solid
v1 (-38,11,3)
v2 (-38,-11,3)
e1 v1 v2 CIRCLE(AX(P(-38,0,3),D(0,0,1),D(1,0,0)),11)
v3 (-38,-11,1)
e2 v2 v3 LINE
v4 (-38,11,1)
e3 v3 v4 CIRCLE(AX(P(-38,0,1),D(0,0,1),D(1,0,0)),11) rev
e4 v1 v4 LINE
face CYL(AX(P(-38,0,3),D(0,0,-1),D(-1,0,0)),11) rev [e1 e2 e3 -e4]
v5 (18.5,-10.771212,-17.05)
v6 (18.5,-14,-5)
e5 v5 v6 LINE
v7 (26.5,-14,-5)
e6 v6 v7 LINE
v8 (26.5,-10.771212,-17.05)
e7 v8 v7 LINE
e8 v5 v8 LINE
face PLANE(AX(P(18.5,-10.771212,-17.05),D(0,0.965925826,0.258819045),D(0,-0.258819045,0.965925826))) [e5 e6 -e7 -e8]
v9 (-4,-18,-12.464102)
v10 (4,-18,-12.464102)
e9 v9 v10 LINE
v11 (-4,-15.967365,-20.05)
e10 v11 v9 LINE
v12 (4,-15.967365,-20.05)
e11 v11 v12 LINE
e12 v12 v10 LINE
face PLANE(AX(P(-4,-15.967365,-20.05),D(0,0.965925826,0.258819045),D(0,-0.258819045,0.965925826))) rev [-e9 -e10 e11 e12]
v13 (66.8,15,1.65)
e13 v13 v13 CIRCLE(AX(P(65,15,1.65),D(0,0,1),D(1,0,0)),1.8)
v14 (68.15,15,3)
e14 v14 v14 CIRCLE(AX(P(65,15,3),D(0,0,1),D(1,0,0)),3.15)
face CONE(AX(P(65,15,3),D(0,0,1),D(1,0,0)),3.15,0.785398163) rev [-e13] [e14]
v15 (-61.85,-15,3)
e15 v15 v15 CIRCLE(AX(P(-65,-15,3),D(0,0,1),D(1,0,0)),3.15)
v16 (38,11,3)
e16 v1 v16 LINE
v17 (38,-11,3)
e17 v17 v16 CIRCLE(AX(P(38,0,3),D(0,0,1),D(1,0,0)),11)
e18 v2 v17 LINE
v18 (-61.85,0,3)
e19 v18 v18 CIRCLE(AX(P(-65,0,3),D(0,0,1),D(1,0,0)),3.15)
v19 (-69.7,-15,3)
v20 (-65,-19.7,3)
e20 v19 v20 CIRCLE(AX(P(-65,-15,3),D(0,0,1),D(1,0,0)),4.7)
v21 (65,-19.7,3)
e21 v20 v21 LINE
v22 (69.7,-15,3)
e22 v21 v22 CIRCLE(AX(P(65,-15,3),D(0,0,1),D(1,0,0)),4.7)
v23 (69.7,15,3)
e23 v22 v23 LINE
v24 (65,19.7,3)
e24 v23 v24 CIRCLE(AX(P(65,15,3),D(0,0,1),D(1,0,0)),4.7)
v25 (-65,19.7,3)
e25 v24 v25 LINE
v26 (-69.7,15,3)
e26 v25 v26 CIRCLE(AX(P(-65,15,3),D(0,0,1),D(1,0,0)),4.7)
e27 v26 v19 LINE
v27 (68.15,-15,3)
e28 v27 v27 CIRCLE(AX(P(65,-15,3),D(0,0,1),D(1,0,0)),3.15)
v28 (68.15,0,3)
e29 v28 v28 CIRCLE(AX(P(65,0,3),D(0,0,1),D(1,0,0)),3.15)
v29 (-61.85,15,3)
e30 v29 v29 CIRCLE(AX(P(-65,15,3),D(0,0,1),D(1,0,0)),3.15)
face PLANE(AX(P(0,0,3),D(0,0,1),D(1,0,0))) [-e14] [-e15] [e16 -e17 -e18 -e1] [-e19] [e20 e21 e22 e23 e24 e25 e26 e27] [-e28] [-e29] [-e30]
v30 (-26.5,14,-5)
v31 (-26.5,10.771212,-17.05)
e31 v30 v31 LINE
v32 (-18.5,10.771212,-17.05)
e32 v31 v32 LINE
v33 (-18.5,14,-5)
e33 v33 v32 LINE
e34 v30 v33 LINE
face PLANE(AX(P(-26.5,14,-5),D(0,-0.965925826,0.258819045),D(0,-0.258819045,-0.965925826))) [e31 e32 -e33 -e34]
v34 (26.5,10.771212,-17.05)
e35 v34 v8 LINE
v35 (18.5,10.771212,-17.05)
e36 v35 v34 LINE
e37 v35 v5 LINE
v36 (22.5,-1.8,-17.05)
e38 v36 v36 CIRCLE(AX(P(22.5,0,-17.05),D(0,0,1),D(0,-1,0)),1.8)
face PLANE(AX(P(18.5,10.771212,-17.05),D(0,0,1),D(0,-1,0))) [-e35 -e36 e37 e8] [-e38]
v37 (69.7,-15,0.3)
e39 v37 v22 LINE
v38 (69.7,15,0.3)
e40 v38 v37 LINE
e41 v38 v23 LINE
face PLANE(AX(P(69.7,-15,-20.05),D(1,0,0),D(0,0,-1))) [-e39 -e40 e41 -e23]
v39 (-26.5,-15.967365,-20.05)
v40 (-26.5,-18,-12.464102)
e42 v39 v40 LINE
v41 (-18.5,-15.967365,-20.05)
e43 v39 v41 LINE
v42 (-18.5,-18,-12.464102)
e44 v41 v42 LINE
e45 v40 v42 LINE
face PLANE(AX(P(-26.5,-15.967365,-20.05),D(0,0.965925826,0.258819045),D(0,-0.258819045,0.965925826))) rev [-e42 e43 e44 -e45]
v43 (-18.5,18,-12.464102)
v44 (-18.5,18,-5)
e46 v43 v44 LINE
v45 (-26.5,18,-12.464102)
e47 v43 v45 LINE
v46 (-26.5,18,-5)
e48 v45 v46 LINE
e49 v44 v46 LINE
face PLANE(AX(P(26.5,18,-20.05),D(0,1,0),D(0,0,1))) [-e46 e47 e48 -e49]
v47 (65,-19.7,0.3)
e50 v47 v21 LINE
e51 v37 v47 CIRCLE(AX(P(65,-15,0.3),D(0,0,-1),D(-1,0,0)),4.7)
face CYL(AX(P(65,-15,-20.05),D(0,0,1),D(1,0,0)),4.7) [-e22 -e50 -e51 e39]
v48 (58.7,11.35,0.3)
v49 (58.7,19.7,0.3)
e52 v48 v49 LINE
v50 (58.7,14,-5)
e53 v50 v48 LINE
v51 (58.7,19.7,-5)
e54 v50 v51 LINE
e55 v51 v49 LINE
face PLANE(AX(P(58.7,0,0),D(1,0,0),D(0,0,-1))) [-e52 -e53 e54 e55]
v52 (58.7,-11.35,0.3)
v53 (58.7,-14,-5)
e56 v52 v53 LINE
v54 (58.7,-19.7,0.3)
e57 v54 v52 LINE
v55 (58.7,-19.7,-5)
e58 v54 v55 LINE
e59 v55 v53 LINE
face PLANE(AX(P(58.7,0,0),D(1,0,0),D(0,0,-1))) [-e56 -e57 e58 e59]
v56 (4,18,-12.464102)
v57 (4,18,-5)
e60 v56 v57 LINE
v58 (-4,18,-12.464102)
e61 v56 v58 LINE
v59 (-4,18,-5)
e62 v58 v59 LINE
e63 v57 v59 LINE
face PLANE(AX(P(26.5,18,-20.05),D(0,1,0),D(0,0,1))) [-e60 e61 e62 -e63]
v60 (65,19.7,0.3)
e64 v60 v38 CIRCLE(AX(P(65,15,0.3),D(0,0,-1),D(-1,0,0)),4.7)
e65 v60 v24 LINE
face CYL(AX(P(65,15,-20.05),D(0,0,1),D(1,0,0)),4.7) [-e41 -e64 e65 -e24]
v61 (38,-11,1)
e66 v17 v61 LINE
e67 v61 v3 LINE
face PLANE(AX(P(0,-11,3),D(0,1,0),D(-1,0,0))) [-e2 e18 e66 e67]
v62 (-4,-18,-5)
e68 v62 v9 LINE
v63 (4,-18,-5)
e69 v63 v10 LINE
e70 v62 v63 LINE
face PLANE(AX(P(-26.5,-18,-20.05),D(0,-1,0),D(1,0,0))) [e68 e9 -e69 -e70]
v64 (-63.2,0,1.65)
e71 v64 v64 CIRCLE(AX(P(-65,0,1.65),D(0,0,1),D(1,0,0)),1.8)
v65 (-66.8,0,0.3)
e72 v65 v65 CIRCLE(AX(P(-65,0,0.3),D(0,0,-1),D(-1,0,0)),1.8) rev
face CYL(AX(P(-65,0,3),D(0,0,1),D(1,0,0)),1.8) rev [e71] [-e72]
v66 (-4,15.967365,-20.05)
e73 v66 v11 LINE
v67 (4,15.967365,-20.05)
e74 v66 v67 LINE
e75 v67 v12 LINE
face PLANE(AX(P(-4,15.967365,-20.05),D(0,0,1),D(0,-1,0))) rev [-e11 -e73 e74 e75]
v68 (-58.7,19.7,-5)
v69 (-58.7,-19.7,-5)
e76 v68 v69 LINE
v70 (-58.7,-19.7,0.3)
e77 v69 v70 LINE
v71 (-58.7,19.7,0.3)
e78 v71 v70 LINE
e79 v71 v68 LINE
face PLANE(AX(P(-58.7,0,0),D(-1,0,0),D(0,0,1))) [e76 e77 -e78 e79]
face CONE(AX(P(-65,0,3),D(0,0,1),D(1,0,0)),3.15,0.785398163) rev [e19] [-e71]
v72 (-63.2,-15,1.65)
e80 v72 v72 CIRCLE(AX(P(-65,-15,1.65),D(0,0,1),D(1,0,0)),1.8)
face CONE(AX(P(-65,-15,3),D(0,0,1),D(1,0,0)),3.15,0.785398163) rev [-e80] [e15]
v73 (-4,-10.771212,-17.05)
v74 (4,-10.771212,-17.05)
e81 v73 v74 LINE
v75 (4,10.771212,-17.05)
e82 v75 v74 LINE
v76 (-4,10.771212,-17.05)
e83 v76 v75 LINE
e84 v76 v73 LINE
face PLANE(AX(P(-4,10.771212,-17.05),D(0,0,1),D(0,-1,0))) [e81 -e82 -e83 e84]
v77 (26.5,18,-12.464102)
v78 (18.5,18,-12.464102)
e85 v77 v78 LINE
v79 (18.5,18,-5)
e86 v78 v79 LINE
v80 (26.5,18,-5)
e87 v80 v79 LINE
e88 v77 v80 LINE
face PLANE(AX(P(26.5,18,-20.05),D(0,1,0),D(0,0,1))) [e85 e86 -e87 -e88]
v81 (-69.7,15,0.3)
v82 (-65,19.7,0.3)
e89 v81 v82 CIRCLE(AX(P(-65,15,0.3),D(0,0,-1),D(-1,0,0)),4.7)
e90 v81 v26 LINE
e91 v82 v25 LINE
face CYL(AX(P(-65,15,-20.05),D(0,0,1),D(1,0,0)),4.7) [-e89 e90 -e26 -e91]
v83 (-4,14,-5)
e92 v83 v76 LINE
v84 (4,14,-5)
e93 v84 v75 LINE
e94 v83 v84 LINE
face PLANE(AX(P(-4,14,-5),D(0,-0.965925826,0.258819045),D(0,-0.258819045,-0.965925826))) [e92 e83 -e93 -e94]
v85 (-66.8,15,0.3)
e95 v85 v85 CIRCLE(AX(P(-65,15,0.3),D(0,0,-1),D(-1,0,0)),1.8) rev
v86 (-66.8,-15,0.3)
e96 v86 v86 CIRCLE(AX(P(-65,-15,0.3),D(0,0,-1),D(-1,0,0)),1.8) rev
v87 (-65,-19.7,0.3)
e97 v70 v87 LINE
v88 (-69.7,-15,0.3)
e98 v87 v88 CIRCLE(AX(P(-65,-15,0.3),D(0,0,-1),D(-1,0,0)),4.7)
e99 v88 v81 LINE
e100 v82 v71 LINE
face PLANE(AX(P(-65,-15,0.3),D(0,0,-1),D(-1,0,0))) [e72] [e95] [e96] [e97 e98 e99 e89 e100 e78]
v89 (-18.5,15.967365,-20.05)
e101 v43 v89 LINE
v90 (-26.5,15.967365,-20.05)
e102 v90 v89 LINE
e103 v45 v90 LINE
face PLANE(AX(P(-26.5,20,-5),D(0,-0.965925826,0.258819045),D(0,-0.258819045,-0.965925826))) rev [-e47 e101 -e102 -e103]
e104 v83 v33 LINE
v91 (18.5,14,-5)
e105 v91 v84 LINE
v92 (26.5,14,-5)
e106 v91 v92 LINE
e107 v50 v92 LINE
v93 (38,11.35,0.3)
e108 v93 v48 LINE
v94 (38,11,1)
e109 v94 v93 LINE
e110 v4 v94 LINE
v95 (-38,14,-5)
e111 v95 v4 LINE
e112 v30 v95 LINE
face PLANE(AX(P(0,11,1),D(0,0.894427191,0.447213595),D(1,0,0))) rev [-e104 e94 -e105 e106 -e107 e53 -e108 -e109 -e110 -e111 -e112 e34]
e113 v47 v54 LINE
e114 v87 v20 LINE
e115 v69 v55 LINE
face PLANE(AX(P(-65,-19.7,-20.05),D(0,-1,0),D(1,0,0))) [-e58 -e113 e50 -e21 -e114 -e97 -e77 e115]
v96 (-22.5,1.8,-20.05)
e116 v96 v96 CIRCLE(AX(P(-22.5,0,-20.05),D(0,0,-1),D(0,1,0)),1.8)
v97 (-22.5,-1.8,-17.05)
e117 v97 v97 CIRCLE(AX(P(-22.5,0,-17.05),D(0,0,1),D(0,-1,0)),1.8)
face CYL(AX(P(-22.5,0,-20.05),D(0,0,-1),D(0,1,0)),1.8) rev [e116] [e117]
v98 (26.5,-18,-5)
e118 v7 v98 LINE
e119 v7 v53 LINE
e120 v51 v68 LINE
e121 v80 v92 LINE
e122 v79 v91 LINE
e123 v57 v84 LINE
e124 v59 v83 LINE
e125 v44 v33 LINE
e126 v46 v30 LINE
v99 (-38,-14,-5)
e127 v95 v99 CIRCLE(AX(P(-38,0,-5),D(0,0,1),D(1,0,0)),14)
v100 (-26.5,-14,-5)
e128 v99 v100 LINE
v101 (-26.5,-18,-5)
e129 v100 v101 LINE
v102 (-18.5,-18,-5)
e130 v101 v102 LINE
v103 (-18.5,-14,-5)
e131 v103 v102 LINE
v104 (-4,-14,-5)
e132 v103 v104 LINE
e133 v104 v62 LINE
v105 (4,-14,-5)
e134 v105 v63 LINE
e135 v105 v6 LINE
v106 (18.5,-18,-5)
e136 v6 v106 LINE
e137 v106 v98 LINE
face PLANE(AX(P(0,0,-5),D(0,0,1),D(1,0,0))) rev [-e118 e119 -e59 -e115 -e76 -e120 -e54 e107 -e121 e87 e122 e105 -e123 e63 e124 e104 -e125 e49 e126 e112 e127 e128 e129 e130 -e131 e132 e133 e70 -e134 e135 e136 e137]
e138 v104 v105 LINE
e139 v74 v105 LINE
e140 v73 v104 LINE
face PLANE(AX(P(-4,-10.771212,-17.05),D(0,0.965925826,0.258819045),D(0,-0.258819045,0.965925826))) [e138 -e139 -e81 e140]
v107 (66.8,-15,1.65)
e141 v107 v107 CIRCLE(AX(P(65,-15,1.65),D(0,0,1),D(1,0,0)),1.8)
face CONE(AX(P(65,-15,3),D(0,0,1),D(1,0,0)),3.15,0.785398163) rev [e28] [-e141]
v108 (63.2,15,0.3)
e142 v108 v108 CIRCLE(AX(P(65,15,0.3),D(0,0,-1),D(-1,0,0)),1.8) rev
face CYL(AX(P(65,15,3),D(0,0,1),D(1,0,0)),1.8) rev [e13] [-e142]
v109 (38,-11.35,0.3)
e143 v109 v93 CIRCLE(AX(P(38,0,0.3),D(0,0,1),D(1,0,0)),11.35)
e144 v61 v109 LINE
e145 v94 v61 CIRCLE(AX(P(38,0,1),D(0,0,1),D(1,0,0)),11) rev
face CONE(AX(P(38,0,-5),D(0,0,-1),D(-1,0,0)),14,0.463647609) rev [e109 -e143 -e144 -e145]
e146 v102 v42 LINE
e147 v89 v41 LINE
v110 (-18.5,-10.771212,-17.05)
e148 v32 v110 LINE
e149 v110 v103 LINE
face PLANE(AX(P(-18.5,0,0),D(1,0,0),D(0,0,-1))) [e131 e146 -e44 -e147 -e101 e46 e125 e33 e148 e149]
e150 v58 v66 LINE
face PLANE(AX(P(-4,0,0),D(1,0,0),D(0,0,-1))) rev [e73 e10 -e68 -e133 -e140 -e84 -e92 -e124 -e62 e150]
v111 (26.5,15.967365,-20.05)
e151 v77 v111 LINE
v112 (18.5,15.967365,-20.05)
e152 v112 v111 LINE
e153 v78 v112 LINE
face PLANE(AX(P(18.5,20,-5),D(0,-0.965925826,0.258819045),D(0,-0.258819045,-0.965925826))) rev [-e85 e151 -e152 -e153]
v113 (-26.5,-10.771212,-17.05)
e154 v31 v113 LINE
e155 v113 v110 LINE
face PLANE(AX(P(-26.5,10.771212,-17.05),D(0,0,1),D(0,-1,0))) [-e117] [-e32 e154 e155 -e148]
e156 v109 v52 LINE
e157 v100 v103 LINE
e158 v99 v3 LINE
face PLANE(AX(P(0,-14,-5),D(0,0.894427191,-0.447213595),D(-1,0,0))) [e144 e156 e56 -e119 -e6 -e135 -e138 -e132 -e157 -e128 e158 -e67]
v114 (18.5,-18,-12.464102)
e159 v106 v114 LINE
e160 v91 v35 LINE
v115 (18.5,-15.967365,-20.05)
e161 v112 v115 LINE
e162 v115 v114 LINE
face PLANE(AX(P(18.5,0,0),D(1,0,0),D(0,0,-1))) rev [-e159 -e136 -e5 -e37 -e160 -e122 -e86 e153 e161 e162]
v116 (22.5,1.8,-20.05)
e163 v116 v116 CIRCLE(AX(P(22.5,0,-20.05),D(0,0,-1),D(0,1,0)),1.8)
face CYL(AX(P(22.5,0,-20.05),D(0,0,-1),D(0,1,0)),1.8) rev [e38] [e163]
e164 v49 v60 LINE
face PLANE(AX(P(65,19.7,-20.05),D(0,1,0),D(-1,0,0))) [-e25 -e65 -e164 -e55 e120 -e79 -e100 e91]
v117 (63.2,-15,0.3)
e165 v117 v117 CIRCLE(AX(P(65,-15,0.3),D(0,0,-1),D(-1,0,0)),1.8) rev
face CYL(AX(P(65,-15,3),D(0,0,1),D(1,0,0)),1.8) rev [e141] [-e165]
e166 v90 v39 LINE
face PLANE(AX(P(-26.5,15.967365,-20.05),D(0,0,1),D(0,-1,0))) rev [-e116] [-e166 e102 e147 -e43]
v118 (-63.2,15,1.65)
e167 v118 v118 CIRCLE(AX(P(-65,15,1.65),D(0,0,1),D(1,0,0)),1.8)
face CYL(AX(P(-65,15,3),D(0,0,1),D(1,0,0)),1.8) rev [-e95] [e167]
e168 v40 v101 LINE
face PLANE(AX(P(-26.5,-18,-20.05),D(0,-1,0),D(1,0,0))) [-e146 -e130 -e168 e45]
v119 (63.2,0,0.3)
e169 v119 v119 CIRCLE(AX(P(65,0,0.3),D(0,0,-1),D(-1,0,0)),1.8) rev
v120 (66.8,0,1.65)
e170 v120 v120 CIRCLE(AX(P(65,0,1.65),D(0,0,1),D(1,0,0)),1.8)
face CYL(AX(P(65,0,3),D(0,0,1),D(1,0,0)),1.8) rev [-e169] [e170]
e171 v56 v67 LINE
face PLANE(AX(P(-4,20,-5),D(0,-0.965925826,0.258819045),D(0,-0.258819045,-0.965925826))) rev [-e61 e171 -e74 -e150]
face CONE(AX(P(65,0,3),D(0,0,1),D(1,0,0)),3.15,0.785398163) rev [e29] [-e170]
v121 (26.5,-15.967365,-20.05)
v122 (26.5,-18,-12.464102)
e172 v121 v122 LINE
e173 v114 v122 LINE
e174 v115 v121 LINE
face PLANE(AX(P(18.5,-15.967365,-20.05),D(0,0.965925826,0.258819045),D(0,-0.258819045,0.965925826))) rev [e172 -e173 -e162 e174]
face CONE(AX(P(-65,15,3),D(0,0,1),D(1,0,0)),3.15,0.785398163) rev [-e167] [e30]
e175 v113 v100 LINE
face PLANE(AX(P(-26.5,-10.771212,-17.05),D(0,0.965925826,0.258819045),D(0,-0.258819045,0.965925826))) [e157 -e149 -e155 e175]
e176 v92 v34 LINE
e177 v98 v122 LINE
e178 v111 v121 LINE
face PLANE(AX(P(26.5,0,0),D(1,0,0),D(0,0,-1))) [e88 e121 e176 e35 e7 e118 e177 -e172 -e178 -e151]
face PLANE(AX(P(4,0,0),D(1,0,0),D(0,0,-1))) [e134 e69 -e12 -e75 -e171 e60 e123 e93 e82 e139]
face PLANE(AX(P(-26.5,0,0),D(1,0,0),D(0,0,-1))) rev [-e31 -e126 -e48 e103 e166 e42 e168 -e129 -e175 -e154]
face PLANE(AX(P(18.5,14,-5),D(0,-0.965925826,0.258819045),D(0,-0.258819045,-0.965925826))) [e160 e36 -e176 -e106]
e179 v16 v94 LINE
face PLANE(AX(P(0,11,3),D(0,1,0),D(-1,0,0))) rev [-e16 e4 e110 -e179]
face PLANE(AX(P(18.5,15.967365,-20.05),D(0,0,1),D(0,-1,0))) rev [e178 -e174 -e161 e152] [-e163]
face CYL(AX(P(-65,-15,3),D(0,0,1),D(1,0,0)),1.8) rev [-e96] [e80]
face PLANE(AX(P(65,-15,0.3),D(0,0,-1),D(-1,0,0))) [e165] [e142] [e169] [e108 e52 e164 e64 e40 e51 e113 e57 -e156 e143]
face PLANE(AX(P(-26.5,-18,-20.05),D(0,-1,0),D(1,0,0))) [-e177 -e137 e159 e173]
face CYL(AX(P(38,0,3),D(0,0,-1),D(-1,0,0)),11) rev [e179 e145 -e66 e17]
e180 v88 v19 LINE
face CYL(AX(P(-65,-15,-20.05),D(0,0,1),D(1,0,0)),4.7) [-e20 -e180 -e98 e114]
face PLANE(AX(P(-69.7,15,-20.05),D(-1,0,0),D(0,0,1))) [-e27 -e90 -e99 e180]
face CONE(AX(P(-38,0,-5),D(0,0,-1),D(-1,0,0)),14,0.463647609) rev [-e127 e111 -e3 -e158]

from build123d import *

# Parameters (mm, degrees)
SKETCH1_W                = 118
SKETCH1_H                = 40
SKETCH1_W_2              = 11
BOSS_EXTRUDE1_DEPTH      = 3
BOSS_EXTRUDE2_START      = -5
SKETCH1_3_W              = 118
SKETCH1_3_H              = 40
BOSS_EXTRUDE2_DEPTH      = 5
FILLET1_R                = 5
CHAMFER1_SIZE            = 3
CHAMFER1_SIZE2           = 6
BOSS_EXTRUDE3_DEPTH      = 4
LPATTERN1_COUNT          = 2
LPATTERN1_PITCH          = 22.5
LPATTERN1_COL_COUNT      = 2
LPATTERN1_COL_PITCH      = 22.5
M3_CLEARANCE_HOLE1_D     = 3.6
M3_CLEARANCE_HOLE1_DEPTH = 9
M3_CLEARANCE_HOLE1_TIP   = 1.081549114
SKETCH9_W                = 53
SKETCH9_H                = 2
CUT_EXTRUDE1_DEPTH       = 75.34044996
CUT_EXTRUDE2_DEPTH       = 77.362965502
SKETCH12_W               = 5
SKETCH12_H               = 39.4
CUT_EXTRUDE3_DEPTH       = 0.3
SKETCH13_W               = 5
SKETCH13_H               = 39.4
CUT_EXTRUDE4_DEPTH       = 0.3
CUT_EXTRUDE5_START       = -0.3
CUT_EXTRUDE5_DEPTH       = 0.3
CUT_EXTRUDE6_DEPTH       = 30


# Read off the part's stored shape, not the designer's step: CSK for M3 Flat Head Machine Screw1
with BuildPart() as part:
    # Sketch1 → Boss-Extrude1 (new body)
    # profile 1 of 3: a face of its own
    with BuildSketch(Plane.XY):
        Rectangle(SKETCH1_W, SKETCH1_H)
        with BuildLine():
            ThreePointArc((-38, -11), (-49, 0), (-38, 11))
            Line((-38, 11), (38, 11))
            ThreePointArc((38, 11), (49, 0), (38, -11))
            Line((38, -11), (-38, -11))
        make_face(mode=Mode.SUBTRACT)
    # profile 2 of 3: a face of its own
    with BuildSketch(Plane.XY):
        with Locations((-64.5, 0)):
            Rectangle(SKETCH1_W_2, SKETCH1_H)
    # profile 3 of 3: a face of its own
    with BuildSketch(Plane.XY):
        with Locations((64.5, 0)):
            Rectangle(SKETCH1_W_2, SKETCH1_H)
    extrude(amount=BOSS_EXTRUDE1_DEPTH)

    # Sketch1<3> → Boss-Extrude2 (add)
    with BuildSketch(Plane.XY.offset(BOSS_EXTRUDE2_START)):
        Rectangle(SKETCH1_3_W, SKETCH1_3_H)
        with BuildLine():
            ThreePointArc((-38, -11), (-49, 0), (-38, 11))
            Line((-38, 11), (38, 11))
            ThreePointArc((38, 11), (49, 0), (38, -11))
            Line((38, -11), (-38, -11))
        make_face(mode=Mode.SUBTRACT)
    extrude(amount=BOSS_EXTRUDE2_DEPTH)

    # CSK for M3 Flat Head Machine Screw1 outl → CSK for M3 Flat Head Machine Screw1 (revolve, cut)
    with BuildSketch(Plane(origin=(65, 0, 0), x_dir=(1, 0, 0), z_dir=(0, -1, 0))):
        Polygon((0, 0), (1.8, 0), (1.8, 1.65), (3.15, 3), (0, 3), align=None)
    revolve(axis=Axis((65, 0, 0), (0, 0, 1)), mode=Mode.SUBTRACT)

    # CSK for M3 Flat Head Machine Screw1 2 ou → CSK for M3 Flat Head Machine Screw1 2 (revolve, cut)
    with BuildSketch(Plane(origin=(-65, 0, 0), x_dir=(1, 0, 0), z_dir=(0, -1, 0))):
        Polygon((0, 0), (1.8, 0), (1.8, 1.65), (3.15, 3), (0, 3), align=None)
    revolve(axis=Axis((-65, 0, 0), (0, 0, 1)), mode=Mode.SUBTRACT)

    # CSK for M3 Flat Head Machine Screw1 3 ou → CSK for M3 Flat Head Machine Screw1 3 (revolve, cut)
    with BuildSketch(Plane(origin=(-65, -15, 0), x_dir=(1, 0, 0), z_dir=(0, -1, 0))):
        Polygon((0, 0), (1.8, 0), (1.8, 1.65), (3.15, 3), (0, 3), align=None)
    revolve(axis=Axis((-65, -15, 0), (0, 0, 1)), mode=Mode.SUBTRACT)

    # CSK for M3 Flat Head Machine Screw1 4 ou → CSK for M3 Flat Head Machine Screw1 4 (revolve, cut)
    with BuildSketch(Plane(origin=(65, 15, 0), x_dir=(1, 0, 0), z_dir=(0, -1, 0))):
        Polygon((0, 0), (1.8, 0), (1.8, 1.65), (3.15, 3), (0, 3), align=None)
    revolve(axis=Axis((65, 15, 0), (0, 0, 1)), mode=Mode.SUBTRACT)

    # CSK for M3 Flat Head Machine Screw1 5 ou → CSK for M3 Flat Head Machine Screw1 5 (revolve, cut)
    with BuildSketch(Plane(origin=(65, -15, 0), x_dir=(1, 0, 0), z_dir=(0, -1, 0))):
        Polygon((0, 0), (1.8, 0), (1.8, 1.65), (3.15, 3), (0, 3), align=None)
    revolve(axis=Axis((65, -15, 0), (0, 0, 1)), mode=Mode.SUBTRACT)

    # CSK for M3 Flat Head Machine Screw1 6 ou → CSK for M3 Flat Head Machine Screw1 6 (revolve, cut)
    with BuildSketch(Plane(origin=(-65, 15, 0), x_dir=(1, 0, 0), z_dir=(0, -1, 0))):
        Polygon((0, 0), (1.8, 0), (1.8, 1.65), (3.15, 3), (0, 3), align=None)
    revolve(axis=Axis((-65, 15, 0), (0, 0, 1)), mode=Mode.SUBTRACT)

    # Fillet1
    fillet1_edges = [part.edges().sort_by_distance(p)[0] for p in [
        (-70, -20, 1.5),
        (-70, 20, 1.5),
        (70, 20, 1.5),
        (70, -20, 1.5),
    ]]
    fillet(fillet1_edges, radius=FILLET1_R)

    # Chamfer1
    chamfer1_edges = [part.edges().sort_by_distance(p)[0] for p in [
        (0, 11, -5),
        (49, 0, -5),
        (-49, 0, -5),
        (0, -11, -5),
    ]]
    chamfer1_side = [part.faces().sort_by_distance(p)[0] for p in [
        (0, 18.75404655, -5),
    ]]
    chamfer(chamfer1_edges, length=CHAMFER1_SIZE, length2=CHAMFER1_SIZE2, reference=chamfer1_side[0])

    # Sketch5 → Boss-Extrude3 (add, symmetric)
    with BuildSketch(Plane(origin=(0, 0, 0), x_dir=(0, 0, -1), z_dir=(1, 0, 0))):
        Polygon((5, -14), (5, -20), (20.050000007, -15.967364652), (20.050000007, 15.967364652), (5, 20), (5, 14), (17.050000007, 10.771212229), (17.050000007, -10.771212229), align=None)
    boss_extrude3 = extrude(amount=BOSS_EXTRUDE3_DEPTH, both=True)

    # LPattern1: Boss-Extrude3 ×2
    with Locations(*[(i * LPATTERN1_PITCH, 0, 0) for i in range(1, LPATTERN1_COUNT)]):
        add(boss_extrude3)

    # LPattern1 col: Boss-Extrude3 ×2
    with Locations(*[(-i * LPATTERN1_COL_PITCH, 0, 0) for i in range(1, LPATTERN1_COL_COUNT)]):
        add(boss_extrude3)

    # M3 Clearance Hole1
    with Locations(Plane(origin=(0, 0, -20.050000007), x_dir=(-1, 0, 0), z_dir=(0, 0, -1))):
        with Locations((-22.5, 0), (22.5, 0)):
            Hole(M3_CLEARANCE_HOLE1_D / 2, depth=M3_CLEARANCE_HOLE1_DEPTH)
            with Locations((0, 0, -(M3_CLEARANCE_HOLE1_DEPTH + M3_CLEARANCE_HOLE1_TIP / 2))):  # 118° drill point
                Cone(0, M3_CLEARANCE_HOLE1_D / 2, M3_CLEARANCE_HOLE1_TIP, mode=Mode.SUBTRACT)

    # Sketch9 → Cut-Extrude1 (cut, through all)
    with BuildSketch(Plane(origin=(0, 0, -5), x_dir=(-1, 0, 0), z_dir=(0, 0, -1))):
        with Locations((0, 19)):
            Rectangle(SKETCH9_W, SKETCH9_H)
        with Locations((0, -19)):
            Rectangle(SKETCH9_W, SKETCH9_H)
    extrude(amount=CUT_EXTRUDE1_DEPTH, mode=Mode.SUBTRACT)

    # Sketch10 → Cut-Extrude2 (cut, through all)
    with BuildSketch(Plane.XY.offset(3)):
        with BuildLine():
            Line((70, -15), (70, 15))
            ThreePointArc((70, 15), (68.535533906, 18.535533906), (65, 20))
            Line((65, 20), (-65, 20))
            ThreePointArc((-65, 20), (-68.535533906, 18.535533906), (-70, 15))
            Line((-70, 15), (-70, -15))
            ThreePointArc((-70, -15), (-68.535533906, -18.535533906), (-65, -20))
            Line((-65, -20), (65, -20))
            ThreePointArc((65, -20), (68.535533906, -18.535533906), (70, -15))
        make_face()
        with BuildLine():
            Line((69.7, -15), (69.7, 15))
            ThreePointArc((69.7, 15), (68.323401872, 18.323401872), (65, 19.7))
            Line((65, 19.7), (-65, 19.7))
            ThreePointArc((-65, 19.7), (-68.323401872, 18.323401872), (-69.7, 15))
            Line((-69.7, 15), (-69.7, -15))
            ThreePointArc((-69.7, -15), (-68.323401872, -18.323401872), (-65, -19.7))
            Line((-65, -19.7), (65, -19.7))
            ThreePointArc((65, -19.7), (68.323401872, -18.323401872), (69.7, -15))
        make_face(mode=Mode.SUBTRACT)
    extrude(amount=-CUT_EXTRUDE2_DEPTH, mode=Mode.SUBTRACT)

    # Sketch12 → Cut-Extrude3 (cut)
    with BuildSketch(Plane(origin=(59, 0, 0), x_dir=(0, 0, -1), z_dir=(1, 0, 0))):
        with Locations((2.5, 0)):
            Rectangle(SKETCH12_W, SKETCH12_H)
    extrude(amount=-CUT_EXTRUDE3_DEPTH, mode=Mode.SUBTRACT)

    # Sketch13 → Cut-Extrude4 (cut)
    with BuildSketch(Plane.ZY.offset(59)):
        with Locations((-2.5, 0)):
            Rectangle(SKETCH13_W, SKETCH13_H)
    extrude(amount=-CUT_EXTRUDE4_DEPTH, mode=Mode.SUBTRACT)

    # Sketch14 → Cut-Extrude5 (cut)
    with BuildSketch(Plane(origin=(0, 0, 0), x_dir=(-1, 0, 0), z_dir=(0, 0, -1)).offset(CUT_EXTRUDE5_START)):
        with BuildLine():
            Line((-65, -19.7), (-58.7, -19.7))
            Line((-58.7, -19.7), (-58.7, 19.7))
            Line((-58.7, 19.7), (-65, 19.7))
            ThreePointArc((-65, 19.7), (-68.323401872, 18.323401872), (-69.7, 15))
            Line((-69.7, 15), (-69.7, -15))
            ThreePointArc((-69.7, -15), (-68.323401872, -18.323401872), (-65, -19.7))
        make_face()
        with BuildLine():
            Line((58.7, -19.7), (65, -19.7))
            ThreePointArc((65, -19.7), (68.323401872, -18.323401872), (69.7, -15))
            Line((69.7, -15), (69.7, 15))
            ThreePointArc((69.7, 15), (68.323401872, 18.323401872), (65, 19.7))
            Line((65, 19.7), (58.7, 19.7))
            Line((58.7, 19.7), (58.7, -19.7))
        make_face()
    extrude(amount=CUT_EXTRUDE5_DEPTH, mode=Mode.SUBTRACT)

    # Sketch15 → Cut-Extrude6 (cut)
    with BuildSketch(Plane(origin=(58.7, 0, 0), x_dir=(0, 0, -1), z_dir=(1, 0, 0))):
        Polygon((-0.3, -11.35), (5, -14), (5, 14), (-0.3, 11.35), align=None)
    extrude(amount=-CUT_EXTRUDE6_DEPTH, mode=Mode.SUBTRACT)


solid = part.part
